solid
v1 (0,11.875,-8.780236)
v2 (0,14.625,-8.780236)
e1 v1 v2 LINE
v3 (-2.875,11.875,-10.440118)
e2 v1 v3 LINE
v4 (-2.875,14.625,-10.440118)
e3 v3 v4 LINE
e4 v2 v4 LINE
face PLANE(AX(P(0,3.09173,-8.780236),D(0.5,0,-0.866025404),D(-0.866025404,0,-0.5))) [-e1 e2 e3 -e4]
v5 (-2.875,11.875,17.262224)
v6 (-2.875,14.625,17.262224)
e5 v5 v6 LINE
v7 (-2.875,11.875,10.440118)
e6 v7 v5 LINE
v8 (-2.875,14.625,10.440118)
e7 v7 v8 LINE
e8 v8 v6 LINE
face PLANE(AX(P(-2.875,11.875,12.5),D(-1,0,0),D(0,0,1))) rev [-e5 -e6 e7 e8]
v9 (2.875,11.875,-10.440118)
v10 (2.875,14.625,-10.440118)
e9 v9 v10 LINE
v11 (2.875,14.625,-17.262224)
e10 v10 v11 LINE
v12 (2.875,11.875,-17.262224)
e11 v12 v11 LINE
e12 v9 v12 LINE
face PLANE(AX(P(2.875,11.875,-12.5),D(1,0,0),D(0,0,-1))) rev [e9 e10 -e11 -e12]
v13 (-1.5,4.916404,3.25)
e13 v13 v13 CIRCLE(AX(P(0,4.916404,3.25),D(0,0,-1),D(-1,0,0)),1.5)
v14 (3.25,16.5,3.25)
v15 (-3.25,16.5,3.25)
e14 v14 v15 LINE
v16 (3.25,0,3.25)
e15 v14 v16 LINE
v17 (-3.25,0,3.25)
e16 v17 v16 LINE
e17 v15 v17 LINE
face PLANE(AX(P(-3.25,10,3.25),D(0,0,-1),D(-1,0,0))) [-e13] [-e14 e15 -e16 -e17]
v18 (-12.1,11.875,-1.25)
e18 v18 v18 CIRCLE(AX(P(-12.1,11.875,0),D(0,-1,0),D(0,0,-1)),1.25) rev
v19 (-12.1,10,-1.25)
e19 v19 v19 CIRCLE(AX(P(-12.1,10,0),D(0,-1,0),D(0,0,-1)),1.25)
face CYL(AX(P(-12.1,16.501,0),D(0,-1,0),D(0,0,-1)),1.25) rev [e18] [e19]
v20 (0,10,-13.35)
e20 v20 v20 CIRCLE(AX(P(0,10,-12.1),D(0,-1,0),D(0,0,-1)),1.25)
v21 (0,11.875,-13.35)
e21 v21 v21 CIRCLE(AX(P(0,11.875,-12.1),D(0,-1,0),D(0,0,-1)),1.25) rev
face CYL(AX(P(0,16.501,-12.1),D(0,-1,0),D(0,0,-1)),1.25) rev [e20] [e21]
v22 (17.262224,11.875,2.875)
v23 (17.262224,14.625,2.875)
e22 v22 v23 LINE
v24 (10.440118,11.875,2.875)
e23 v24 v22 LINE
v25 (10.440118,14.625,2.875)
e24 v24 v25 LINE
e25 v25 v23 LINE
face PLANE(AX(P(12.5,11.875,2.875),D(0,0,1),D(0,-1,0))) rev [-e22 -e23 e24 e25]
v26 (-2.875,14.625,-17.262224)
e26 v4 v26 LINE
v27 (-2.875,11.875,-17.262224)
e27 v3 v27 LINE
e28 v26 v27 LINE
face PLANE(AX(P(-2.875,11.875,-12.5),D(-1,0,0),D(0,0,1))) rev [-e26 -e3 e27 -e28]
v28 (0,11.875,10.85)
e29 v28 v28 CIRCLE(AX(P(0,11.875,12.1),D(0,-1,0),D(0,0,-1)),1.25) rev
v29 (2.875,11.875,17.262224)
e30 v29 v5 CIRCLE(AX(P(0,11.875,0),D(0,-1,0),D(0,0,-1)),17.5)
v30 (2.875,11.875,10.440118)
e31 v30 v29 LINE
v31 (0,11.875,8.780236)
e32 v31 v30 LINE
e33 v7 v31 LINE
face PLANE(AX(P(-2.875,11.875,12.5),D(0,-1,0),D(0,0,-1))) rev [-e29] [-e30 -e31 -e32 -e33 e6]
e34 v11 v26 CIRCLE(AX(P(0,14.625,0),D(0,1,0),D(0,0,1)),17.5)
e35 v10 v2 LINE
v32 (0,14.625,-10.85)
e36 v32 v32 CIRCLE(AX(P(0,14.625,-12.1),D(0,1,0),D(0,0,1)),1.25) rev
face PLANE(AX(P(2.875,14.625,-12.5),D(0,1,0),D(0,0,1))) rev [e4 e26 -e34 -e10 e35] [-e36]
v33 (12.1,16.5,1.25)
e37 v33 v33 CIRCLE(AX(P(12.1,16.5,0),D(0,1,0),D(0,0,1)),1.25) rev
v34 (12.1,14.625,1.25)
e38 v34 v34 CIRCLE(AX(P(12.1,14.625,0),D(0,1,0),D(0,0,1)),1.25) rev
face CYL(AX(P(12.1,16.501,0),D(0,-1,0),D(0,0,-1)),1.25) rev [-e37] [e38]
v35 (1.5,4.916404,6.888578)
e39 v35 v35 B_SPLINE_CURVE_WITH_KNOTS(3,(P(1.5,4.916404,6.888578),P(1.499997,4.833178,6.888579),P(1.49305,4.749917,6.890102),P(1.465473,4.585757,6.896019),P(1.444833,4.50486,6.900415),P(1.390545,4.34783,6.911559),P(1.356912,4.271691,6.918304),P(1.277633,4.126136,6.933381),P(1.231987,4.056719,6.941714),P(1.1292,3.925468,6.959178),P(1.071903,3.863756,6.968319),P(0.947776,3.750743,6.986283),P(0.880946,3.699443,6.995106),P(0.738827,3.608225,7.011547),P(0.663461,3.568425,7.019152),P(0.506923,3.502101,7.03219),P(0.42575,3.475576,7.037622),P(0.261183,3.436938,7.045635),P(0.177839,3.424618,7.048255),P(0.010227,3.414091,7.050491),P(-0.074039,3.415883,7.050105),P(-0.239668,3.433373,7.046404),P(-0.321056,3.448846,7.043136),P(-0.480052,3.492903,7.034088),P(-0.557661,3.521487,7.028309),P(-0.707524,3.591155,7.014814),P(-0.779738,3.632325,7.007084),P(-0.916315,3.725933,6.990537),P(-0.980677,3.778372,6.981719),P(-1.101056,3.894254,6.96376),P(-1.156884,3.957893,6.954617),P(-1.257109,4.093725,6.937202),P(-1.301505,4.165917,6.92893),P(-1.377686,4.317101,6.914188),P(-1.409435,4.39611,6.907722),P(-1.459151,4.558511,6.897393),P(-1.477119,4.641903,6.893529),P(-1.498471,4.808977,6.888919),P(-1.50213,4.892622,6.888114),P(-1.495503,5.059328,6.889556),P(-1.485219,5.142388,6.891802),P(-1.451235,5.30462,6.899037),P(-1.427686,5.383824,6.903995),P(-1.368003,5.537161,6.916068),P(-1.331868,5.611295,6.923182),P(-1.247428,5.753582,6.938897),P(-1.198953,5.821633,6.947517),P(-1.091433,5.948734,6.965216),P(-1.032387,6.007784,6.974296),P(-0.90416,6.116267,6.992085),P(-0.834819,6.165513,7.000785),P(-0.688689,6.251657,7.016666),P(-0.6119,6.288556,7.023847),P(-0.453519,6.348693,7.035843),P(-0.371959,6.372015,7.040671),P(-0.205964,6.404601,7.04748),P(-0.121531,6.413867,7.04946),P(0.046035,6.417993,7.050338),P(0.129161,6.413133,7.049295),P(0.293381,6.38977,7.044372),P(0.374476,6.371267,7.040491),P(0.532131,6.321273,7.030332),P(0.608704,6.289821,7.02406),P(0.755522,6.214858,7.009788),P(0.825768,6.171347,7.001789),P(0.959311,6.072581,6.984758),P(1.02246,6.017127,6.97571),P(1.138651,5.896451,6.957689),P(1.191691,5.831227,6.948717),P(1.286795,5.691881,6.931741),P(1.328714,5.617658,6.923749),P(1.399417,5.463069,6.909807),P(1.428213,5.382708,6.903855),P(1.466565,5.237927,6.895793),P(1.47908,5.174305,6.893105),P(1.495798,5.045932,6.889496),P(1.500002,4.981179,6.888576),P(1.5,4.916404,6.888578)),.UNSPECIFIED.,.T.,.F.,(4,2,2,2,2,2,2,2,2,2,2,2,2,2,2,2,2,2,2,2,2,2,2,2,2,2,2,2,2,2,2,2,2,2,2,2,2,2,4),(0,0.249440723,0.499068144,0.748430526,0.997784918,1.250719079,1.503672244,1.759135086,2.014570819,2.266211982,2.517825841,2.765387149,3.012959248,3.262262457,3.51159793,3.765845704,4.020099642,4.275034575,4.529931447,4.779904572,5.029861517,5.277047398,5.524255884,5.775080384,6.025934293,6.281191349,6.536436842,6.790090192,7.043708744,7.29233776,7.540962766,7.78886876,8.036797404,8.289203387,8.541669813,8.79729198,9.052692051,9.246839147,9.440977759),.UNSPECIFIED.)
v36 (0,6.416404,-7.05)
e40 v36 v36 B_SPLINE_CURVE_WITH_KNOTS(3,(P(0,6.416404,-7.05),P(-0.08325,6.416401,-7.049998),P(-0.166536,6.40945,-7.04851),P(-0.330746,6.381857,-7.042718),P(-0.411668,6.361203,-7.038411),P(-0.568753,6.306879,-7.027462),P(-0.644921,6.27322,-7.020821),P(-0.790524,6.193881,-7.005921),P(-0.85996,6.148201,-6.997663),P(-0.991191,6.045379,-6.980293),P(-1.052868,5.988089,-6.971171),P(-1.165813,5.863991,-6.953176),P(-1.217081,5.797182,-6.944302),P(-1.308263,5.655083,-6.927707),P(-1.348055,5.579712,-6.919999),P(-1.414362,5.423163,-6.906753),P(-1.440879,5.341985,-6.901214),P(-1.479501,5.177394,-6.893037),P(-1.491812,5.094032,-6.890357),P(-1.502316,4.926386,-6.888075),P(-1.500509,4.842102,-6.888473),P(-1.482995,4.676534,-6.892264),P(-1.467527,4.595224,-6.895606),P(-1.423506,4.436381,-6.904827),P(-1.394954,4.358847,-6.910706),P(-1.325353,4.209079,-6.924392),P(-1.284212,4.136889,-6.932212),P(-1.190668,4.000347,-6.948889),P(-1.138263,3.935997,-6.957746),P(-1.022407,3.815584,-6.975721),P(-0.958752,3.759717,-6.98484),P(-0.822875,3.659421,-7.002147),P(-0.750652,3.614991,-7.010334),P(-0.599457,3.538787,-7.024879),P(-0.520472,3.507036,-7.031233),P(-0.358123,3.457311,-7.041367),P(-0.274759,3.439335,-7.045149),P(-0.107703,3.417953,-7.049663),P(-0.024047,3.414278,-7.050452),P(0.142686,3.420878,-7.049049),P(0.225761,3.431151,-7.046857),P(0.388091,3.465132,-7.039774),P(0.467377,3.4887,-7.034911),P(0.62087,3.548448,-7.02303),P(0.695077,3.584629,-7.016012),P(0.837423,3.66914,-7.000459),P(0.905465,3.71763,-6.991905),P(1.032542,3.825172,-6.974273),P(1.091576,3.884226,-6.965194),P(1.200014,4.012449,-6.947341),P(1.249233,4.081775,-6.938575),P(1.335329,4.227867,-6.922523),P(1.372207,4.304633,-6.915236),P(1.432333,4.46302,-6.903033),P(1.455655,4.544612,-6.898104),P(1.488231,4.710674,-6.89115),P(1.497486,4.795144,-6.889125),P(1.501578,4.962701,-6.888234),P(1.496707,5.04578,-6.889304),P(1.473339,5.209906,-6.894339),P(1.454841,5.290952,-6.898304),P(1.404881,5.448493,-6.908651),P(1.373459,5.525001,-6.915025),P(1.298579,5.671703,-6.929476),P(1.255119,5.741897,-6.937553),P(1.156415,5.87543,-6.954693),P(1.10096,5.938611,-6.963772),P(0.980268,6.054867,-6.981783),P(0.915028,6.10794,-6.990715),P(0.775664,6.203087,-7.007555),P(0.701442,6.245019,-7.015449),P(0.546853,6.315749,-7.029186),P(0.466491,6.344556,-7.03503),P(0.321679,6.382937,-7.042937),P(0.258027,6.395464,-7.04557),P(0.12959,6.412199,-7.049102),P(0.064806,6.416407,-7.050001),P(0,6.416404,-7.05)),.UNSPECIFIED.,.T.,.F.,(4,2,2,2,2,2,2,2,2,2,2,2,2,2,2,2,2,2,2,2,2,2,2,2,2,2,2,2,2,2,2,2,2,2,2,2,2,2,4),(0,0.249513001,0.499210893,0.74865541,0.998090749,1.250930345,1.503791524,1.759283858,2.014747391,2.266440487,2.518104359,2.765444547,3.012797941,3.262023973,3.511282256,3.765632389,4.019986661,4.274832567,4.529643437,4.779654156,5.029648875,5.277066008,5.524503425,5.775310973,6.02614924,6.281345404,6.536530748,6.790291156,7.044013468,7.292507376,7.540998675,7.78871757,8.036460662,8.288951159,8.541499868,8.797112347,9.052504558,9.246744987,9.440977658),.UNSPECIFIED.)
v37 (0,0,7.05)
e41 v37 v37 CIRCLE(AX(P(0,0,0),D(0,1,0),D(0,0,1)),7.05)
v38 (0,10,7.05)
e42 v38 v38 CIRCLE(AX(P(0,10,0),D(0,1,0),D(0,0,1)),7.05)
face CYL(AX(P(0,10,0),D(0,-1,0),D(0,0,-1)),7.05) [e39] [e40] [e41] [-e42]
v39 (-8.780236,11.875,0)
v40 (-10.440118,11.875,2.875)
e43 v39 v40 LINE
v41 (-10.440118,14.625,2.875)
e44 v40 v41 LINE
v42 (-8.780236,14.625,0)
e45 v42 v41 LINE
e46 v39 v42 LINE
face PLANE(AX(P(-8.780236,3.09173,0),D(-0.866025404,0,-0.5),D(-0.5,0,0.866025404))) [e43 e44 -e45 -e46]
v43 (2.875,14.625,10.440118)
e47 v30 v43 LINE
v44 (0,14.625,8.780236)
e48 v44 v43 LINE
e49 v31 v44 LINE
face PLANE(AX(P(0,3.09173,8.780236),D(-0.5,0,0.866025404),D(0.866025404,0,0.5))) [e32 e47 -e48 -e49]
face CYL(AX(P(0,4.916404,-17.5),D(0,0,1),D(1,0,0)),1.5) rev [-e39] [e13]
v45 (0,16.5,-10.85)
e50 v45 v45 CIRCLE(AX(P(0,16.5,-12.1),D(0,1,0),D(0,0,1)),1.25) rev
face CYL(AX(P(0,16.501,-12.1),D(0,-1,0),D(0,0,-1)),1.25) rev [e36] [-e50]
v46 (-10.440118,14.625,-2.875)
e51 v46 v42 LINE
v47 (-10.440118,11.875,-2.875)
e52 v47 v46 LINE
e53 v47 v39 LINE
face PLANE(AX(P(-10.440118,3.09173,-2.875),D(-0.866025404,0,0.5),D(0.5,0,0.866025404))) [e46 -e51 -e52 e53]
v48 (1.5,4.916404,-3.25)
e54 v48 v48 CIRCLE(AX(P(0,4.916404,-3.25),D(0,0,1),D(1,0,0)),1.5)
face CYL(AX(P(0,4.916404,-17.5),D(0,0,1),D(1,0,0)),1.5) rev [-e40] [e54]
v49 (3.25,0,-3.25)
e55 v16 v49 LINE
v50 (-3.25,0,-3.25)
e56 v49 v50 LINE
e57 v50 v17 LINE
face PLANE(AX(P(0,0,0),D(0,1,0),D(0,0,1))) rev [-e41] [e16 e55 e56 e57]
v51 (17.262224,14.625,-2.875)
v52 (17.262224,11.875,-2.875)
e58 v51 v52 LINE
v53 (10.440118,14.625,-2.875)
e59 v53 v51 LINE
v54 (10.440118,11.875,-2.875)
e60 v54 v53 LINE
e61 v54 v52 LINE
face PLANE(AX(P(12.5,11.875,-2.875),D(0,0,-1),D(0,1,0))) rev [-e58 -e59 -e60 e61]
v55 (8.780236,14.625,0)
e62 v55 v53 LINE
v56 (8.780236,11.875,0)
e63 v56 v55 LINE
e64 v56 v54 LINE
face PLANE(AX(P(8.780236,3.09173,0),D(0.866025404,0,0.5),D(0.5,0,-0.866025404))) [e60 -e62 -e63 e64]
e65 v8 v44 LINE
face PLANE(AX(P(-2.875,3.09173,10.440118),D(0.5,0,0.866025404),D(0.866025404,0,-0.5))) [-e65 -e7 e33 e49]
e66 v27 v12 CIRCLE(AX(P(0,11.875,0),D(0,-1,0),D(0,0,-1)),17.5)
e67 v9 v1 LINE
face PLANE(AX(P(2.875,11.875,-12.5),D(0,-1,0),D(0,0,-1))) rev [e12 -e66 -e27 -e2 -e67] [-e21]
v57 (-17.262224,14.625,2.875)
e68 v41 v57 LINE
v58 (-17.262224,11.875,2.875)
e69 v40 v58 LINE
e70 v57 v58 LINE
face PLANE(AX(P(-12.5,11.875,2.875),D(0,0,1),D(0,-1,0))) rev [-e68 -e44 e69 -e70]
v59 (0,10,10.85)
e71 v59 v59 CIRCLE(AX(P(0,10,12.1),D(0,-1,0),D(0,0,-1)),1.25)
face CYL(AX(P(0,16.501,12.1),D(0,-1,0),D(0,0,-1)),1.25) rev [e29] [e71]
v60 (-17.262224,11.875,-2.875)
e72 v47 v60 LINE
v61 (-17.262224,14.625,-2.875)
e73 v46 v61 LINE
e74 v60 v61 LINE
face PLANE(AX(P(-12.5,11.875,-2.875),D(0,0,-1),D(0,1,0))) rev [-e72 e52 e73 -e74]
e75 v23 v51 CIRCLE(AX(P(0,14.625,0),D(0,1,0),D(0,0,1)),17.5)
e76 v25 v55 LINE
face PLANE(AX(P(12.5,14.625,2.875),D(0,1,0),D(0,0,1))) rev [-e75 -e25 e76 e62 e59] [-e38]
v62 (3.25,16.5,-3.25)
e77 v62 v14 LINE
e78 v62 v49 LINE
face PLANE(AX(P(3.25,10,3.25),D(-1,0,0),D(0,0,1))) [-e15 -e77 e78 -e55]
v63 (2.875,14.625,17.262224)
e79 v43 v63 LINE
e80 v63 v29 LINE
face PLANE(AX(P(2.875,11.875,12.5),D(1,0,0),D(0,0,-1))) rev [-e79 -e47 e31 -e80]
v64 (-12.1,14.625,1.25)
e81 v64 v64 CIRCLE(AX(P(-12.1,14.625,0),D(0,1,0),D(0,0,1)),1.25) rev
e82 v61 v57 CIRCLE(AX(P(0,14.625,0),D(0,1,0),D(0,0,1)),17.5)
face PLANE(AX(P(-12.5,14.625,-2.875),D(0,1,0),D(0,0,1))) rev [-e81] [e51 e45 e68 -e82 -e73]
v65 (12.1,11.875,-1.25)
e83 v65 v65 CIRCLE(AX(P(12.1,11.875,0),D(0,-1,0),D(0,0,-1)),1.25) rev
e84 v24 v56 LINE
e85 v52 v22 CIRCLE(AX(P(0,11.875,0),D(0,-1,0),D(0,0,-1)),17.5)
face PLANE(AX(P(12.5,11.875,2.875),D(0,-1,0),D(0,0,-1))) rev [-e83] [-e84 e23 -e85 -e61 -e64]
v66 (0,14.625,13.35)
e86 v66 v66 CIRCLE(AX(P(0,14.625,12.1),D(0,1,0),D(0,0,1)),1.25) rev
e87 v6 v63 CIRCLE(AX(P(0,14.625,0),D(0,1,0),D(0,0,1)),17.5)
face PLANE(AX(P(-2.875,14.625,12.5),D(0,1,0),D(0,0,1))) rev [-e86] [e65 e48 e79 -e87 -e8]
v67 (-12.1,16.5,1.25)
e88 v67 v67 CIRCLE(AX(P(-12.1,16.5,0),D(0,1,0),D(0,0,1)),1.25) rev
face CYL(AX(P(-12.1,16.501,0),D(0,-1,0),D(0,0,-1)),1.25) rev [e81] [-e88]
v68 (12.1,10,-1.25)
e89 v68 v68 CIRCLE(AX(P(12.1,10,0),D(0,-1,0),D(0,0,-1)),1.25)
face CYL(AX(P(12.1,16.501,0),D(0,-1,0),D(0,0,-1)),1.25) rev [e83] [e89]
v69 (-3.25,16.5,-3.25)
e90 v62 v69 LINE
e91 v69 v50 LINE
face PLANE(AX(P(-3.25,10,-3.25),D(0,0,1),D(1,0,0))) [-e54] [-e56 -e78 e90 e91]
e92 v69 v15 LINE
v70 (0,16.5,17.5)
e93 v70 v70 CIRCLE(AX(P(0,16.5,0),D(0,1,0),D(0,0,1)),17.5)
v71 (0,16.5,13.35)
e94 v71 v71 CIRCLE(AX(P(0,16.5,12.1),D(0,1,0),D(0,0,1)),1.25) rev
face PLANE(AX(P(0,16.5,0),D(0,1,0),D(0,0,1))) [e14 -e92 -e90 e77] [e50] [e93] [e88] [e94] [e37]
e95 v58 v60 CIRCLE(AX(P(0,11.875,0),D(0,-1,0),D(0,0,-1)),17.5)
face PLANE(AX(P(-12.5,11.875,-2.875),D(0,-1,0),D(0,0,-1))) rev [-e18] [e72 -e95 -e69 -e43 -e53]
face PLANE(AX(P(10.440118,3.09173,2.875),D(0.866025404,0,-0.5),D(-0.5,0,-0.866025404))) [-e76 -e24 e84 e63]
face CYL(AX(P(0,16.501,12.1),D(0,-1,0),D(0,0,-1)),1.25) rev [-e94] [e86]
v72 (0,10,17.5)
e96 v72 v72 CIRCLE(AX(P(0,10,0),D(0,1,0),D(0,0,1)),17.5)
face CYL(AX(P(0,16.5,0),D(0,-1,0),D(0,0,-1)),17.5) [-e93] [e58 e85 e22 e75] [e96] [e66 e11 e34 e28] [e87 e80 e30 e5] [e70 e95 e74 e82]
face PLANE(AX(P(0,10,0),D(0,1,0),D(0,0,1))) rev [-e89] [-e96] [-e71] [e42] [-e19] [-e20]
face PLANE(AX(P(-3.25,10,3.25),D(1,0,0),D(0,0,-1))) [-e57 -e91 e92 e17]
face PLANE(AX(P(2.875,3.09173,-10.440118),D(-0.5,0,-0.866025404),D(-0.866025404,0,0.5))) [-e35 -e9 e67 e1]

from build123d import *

# Parameters (mm, degrees)
SKETCH1_R               = 7.05
SKETCH1_W               = 6.5
SKETCH1_H               = 6.5
BOSS_EXTRUDE1_DEPTH     = 10
SKETCH2_R               = 17.5
BOSS_EXTRUDE2_DEPTH     = 6.5
CUT_EXTRUDE1_REACH      = 28.693
SKETCH3_R               = 1.25
CUT_EXTRUDE2_DEPTH      = 30.744747435
CUT_EXTRUDE2_DEPTH_BACK = 30.744747435
SKETCH4_R               = 1.5
CUT_EXTRUDE3_DEPTH      = 10
CUT_EXTRUDE3_DEPTH_BACK = 10
SKETCH6_W               = 6.5
SKETCH6_H               = 6.5
SKETCH8_W               = 5.75
SKETCH8_H               = 2.75
CUT_EXTRUDE4_DEPTH      = 5
CUT_EXTRUDE5_DEPTH      = 2.75
CIRPATTERN1_START       = 11.875
CIRPATTERN1_OUTLINE_R   = 1.25
CIRPATTERN1_DEPTH       = 2.75


# Read off the part's stored shape, not the designer's step: CirPattern1
with BuildPart() as part:
    # Sketch1 → Boss-Extrude1 (new body)
    with BuildSketch(Plane(origin=(0, 0, 0), x_dir=(1, 0, 0), z_dir=(0, 1, 0))):
        with Locations(Location((0, 0, 0), (0, 0, 270))):
            Circle(SKETCH1_R)
        Rectangle(SKETCH1_W, SKETCH1_H, mode=Mode.SUBTRACT)
    extrude(amount=BOSS_EXTRUDE1_DEPTH)

    # Sketch2 → Boss-Extrude2 (add)
    with BuildSketch(Plane(origin=(0, 10, 0), x_dir=(1, 0, 0), z_dir=(0, 1, 0))):
        with Locations(Location((0, 0, 0), (0, 0, 90))):
            Circle(SKETCH2_R)
    extrude(amount=BOSS_EXTRUDE2_DEPTH)

    # Sketch3 → Cut-Extrude1 (cut, up to next)
    with BuildSketch(Plane.XZ.offset(-10), mode=Mode.PRIVATE) as cut_extrude1_sk1:
        with Locations(Location((12.1, 0, 0), (0, 0, 270))):
            Circle(SKETCH3_R)
    cut_extrude1_tool1 = extrude(cut_extrude1_sk1.sketch, amount=-CUT_EXTRUDE1_REACH, mode=Mode.PRIVATE) & part.part
    # Sketch3 → Cut-Extrude1 (cut, up to next)
    with BuildSketch(Plane.XZ.offset(-10), mode=Mode.PRIVATE) as cut_extrude1_sk2:
        with Locations(Location((0, -12.1, 0), (0, 0, 270))):
            Circle(SKETCH3_R)
    cut_extrude1_tool2 = extrude(cut_extrude1_sk2.sketch, amount=-CUT_EXTRUDE1_REACH, mode=Mode.PRIVATE) & part.part
    # Sketch3 → Cut-Extrude1 (cut, up to next)
    with BuildSketch(Plane.XZ.offset(-10), mode=Mode.PRIVATE) as cut_extrude1_sk3:
        with Locations(Location((-12.1, 0, 0), (0, 0, 270))):
            Circle(SKETCH3_R)
    cut_extrude1_tool3 = extrude(cut_extrude1_sk3.sketch, amount=-CUT_EXTRUDE1_REACH, mode=Mode.PRIVATE) & part.part
    # Sketch3 → Cut-Extrude1 (cut, up to next)
    with BuildSketch(Plane.XZ.offset(-10), mode=Mode.PRIVATE) as cut_extrude1_sk4:
        with Locations(Location((0, 12.1, 0), (0, 0, 270))):
            Circle(SKETCH3_R)
    cut_extrude1_tool4 = extrude(cut_extrude1_sk4.sketch, amount=-CUT_EXTRUDE1_REACH, mode=Mode.PRIVATE) & part.part
    add(cut_extrude1_tool1.solids().sort_by_distance((12.1, 10, 0))[0], mode=Mode.SUBTRACT)
    add(cut_extrude1_tool2.solids().sort_by_distance((0, 10, -12.1))[0], mode=Mode.SUBTRACT)
    add(cut_extrude1_tool3.solids().sort_by_distance((-12.1, 10, 0))[0], mode=Mode.SUBTRACT)
    add(cut_extrude1_tool4.solids().sort_by_distance((0, 10, 12.1))[0], mode=Mode.SUBTRACT)

    # Sketch4 → Cut-Extrude2 (cut, two sides: drawn at the far end of the back side and taken through both)
    with BuildSketch(Plane.XY.offset(-CUT_EXTRUDE2_DEPTH_BACK)):
        with Locations((0, 4.916404418)):
            Circle(SKETCH4_R)
    extrude(amount=CUT_EXTRUDE2_DEPTH + CUT_EXTRUDE2_DEPTH_BACK, mode=Mode.SUBTRACT)

    # Sketch6 → Cut-Extrude3 (cut, two sides: drawn at the far end of the back side and taken through both)
    with BuildSketch(Plane(origin=(0, 10, 0), x_dir=(-1, 0, 0), z_dir=(0, -1, 0)).offset(-CUT_EXTRUDE3_DEPTH_BACK)):
        Rectangle(SKETCH6_W, SKETCH6_H)
    extrude(amount=CUT_EXTRUDE3_DEPTH + CUT_EXTRUDE3_DEPTH_BACK, mode=Mode.SUBTRACT)

    # Sketch8 → Cut-Extrude4 (cut)
    with BuildSketch(Plane(origin=(17.5, 0, 0), x_dir=(0, 0, -1), z_dir=(1, 0, 0))):
        with Locations((0, 13.25)):
            Rectangle(SKETCH8_W, SKETCH8_H)
    extrude(amount=-CUT_EXTRUDE4_DEPTH, mode=Mode.SUBTRACT)

    # Sketch9 → Cut-Extrude5 (cut)
    with BuildSketch(Plane.XZ.offset(-14.625)):
        Polygon((15.419764048, 0), (13.759882024, 2.875), (10.440117976, 2.875), (8.780235952, 0), (10.440117976, -2.875), (13.759882024, -2.875), align=None)
    extrude(amount=CUT_EXTRUDE5_DEPTH, mode=Mode.SUBTRACT)

    # CirPattern1 outline → CirPattern1 (cut)
    # profile 1 of 3: a face of its own
    with BuildSketch(Plane(origin=(0, 0, 0), x_dir=(1, 0, 0), z_dir=(0, 1, 0)).offset(CIRPATTERN1_START)):
        with BuildLine():
            Line((-8.780235952, 0), (-10.440117976, 2.875))
            Line((-10.440117976, 2.875), (-17.26222393, 2.875))
            ThreePointArc((-17.26222393, 2.875), (-17.5, 0), (-17.26222393, -2.875))
            Line((-17.26222393, -2.875), (-10.440117976, -2.875))
            Line((-10.440117976, -2.875), (-8.780235952, 0))
        make_face()
        with Locations((-12.1, 0)):
            Circle(CIRPATTERN1_OUTLINE_R, mode=Mode.SUBTRACT)
    # profile 2 of 3: a face of its own
    with BuildSketch(Plane(origin=(0, 0, 0), x_dir=(1, 0, 0), z_dir=(0, 1, 0)).offset(CIRPATTERN1_START)):
        with BuildLine():
            ThreePointArc((2.875, 17.26222393), (0, 17.5), (-2.875, 17.26222393))
            Line((-2.875, 17.26222393), (-2.875, 10.440117976))
            Line((-2.875, 10.440117976), (0, 8.780235952))
            Line((0, 8.780235952), (2.875, 10.440117976))
            Line((2.875, 10.440117976), (2.875, 17.26222393))
        make_face()
        with Locations((0, 12.1)):
            Circle(CIRPATTERN1_OUTLINE_R, mode=Mode.SUBTRACT)
    # profile 3 of 3: a face of its own
    with BuildSketch(Plane(origin=(0, 0, 0), x_dir=(1, 0, 0), z_dir=(0, 1, 0)).offset(CIRPATTERN1_START)):
        with BuildLine():
            Line((-2.875, -10.440117976), (-2.875, -17.26222393))
            ThreePointArc((-2.875, -17.26222393), (0, -17.5), (2.875, -17.26222393))
            Line((2.875, -17.26222393), (2.875, -10.440117976))
            Line((2.875, -10.440117976), (0, -8.780235952))
            Line((0, -8.780235952), (-2.875, -10.440117976))
        make_face()
        with Locations((0, -12.1)):
            Circle(CIRPATTERN1_OUTLINE_R, mode=Mode.SUBTRACT)
    extrude(amount=CIRPATTERN1_DEPTH, mode=Mode.SUBTRACT)


solid = part.part
